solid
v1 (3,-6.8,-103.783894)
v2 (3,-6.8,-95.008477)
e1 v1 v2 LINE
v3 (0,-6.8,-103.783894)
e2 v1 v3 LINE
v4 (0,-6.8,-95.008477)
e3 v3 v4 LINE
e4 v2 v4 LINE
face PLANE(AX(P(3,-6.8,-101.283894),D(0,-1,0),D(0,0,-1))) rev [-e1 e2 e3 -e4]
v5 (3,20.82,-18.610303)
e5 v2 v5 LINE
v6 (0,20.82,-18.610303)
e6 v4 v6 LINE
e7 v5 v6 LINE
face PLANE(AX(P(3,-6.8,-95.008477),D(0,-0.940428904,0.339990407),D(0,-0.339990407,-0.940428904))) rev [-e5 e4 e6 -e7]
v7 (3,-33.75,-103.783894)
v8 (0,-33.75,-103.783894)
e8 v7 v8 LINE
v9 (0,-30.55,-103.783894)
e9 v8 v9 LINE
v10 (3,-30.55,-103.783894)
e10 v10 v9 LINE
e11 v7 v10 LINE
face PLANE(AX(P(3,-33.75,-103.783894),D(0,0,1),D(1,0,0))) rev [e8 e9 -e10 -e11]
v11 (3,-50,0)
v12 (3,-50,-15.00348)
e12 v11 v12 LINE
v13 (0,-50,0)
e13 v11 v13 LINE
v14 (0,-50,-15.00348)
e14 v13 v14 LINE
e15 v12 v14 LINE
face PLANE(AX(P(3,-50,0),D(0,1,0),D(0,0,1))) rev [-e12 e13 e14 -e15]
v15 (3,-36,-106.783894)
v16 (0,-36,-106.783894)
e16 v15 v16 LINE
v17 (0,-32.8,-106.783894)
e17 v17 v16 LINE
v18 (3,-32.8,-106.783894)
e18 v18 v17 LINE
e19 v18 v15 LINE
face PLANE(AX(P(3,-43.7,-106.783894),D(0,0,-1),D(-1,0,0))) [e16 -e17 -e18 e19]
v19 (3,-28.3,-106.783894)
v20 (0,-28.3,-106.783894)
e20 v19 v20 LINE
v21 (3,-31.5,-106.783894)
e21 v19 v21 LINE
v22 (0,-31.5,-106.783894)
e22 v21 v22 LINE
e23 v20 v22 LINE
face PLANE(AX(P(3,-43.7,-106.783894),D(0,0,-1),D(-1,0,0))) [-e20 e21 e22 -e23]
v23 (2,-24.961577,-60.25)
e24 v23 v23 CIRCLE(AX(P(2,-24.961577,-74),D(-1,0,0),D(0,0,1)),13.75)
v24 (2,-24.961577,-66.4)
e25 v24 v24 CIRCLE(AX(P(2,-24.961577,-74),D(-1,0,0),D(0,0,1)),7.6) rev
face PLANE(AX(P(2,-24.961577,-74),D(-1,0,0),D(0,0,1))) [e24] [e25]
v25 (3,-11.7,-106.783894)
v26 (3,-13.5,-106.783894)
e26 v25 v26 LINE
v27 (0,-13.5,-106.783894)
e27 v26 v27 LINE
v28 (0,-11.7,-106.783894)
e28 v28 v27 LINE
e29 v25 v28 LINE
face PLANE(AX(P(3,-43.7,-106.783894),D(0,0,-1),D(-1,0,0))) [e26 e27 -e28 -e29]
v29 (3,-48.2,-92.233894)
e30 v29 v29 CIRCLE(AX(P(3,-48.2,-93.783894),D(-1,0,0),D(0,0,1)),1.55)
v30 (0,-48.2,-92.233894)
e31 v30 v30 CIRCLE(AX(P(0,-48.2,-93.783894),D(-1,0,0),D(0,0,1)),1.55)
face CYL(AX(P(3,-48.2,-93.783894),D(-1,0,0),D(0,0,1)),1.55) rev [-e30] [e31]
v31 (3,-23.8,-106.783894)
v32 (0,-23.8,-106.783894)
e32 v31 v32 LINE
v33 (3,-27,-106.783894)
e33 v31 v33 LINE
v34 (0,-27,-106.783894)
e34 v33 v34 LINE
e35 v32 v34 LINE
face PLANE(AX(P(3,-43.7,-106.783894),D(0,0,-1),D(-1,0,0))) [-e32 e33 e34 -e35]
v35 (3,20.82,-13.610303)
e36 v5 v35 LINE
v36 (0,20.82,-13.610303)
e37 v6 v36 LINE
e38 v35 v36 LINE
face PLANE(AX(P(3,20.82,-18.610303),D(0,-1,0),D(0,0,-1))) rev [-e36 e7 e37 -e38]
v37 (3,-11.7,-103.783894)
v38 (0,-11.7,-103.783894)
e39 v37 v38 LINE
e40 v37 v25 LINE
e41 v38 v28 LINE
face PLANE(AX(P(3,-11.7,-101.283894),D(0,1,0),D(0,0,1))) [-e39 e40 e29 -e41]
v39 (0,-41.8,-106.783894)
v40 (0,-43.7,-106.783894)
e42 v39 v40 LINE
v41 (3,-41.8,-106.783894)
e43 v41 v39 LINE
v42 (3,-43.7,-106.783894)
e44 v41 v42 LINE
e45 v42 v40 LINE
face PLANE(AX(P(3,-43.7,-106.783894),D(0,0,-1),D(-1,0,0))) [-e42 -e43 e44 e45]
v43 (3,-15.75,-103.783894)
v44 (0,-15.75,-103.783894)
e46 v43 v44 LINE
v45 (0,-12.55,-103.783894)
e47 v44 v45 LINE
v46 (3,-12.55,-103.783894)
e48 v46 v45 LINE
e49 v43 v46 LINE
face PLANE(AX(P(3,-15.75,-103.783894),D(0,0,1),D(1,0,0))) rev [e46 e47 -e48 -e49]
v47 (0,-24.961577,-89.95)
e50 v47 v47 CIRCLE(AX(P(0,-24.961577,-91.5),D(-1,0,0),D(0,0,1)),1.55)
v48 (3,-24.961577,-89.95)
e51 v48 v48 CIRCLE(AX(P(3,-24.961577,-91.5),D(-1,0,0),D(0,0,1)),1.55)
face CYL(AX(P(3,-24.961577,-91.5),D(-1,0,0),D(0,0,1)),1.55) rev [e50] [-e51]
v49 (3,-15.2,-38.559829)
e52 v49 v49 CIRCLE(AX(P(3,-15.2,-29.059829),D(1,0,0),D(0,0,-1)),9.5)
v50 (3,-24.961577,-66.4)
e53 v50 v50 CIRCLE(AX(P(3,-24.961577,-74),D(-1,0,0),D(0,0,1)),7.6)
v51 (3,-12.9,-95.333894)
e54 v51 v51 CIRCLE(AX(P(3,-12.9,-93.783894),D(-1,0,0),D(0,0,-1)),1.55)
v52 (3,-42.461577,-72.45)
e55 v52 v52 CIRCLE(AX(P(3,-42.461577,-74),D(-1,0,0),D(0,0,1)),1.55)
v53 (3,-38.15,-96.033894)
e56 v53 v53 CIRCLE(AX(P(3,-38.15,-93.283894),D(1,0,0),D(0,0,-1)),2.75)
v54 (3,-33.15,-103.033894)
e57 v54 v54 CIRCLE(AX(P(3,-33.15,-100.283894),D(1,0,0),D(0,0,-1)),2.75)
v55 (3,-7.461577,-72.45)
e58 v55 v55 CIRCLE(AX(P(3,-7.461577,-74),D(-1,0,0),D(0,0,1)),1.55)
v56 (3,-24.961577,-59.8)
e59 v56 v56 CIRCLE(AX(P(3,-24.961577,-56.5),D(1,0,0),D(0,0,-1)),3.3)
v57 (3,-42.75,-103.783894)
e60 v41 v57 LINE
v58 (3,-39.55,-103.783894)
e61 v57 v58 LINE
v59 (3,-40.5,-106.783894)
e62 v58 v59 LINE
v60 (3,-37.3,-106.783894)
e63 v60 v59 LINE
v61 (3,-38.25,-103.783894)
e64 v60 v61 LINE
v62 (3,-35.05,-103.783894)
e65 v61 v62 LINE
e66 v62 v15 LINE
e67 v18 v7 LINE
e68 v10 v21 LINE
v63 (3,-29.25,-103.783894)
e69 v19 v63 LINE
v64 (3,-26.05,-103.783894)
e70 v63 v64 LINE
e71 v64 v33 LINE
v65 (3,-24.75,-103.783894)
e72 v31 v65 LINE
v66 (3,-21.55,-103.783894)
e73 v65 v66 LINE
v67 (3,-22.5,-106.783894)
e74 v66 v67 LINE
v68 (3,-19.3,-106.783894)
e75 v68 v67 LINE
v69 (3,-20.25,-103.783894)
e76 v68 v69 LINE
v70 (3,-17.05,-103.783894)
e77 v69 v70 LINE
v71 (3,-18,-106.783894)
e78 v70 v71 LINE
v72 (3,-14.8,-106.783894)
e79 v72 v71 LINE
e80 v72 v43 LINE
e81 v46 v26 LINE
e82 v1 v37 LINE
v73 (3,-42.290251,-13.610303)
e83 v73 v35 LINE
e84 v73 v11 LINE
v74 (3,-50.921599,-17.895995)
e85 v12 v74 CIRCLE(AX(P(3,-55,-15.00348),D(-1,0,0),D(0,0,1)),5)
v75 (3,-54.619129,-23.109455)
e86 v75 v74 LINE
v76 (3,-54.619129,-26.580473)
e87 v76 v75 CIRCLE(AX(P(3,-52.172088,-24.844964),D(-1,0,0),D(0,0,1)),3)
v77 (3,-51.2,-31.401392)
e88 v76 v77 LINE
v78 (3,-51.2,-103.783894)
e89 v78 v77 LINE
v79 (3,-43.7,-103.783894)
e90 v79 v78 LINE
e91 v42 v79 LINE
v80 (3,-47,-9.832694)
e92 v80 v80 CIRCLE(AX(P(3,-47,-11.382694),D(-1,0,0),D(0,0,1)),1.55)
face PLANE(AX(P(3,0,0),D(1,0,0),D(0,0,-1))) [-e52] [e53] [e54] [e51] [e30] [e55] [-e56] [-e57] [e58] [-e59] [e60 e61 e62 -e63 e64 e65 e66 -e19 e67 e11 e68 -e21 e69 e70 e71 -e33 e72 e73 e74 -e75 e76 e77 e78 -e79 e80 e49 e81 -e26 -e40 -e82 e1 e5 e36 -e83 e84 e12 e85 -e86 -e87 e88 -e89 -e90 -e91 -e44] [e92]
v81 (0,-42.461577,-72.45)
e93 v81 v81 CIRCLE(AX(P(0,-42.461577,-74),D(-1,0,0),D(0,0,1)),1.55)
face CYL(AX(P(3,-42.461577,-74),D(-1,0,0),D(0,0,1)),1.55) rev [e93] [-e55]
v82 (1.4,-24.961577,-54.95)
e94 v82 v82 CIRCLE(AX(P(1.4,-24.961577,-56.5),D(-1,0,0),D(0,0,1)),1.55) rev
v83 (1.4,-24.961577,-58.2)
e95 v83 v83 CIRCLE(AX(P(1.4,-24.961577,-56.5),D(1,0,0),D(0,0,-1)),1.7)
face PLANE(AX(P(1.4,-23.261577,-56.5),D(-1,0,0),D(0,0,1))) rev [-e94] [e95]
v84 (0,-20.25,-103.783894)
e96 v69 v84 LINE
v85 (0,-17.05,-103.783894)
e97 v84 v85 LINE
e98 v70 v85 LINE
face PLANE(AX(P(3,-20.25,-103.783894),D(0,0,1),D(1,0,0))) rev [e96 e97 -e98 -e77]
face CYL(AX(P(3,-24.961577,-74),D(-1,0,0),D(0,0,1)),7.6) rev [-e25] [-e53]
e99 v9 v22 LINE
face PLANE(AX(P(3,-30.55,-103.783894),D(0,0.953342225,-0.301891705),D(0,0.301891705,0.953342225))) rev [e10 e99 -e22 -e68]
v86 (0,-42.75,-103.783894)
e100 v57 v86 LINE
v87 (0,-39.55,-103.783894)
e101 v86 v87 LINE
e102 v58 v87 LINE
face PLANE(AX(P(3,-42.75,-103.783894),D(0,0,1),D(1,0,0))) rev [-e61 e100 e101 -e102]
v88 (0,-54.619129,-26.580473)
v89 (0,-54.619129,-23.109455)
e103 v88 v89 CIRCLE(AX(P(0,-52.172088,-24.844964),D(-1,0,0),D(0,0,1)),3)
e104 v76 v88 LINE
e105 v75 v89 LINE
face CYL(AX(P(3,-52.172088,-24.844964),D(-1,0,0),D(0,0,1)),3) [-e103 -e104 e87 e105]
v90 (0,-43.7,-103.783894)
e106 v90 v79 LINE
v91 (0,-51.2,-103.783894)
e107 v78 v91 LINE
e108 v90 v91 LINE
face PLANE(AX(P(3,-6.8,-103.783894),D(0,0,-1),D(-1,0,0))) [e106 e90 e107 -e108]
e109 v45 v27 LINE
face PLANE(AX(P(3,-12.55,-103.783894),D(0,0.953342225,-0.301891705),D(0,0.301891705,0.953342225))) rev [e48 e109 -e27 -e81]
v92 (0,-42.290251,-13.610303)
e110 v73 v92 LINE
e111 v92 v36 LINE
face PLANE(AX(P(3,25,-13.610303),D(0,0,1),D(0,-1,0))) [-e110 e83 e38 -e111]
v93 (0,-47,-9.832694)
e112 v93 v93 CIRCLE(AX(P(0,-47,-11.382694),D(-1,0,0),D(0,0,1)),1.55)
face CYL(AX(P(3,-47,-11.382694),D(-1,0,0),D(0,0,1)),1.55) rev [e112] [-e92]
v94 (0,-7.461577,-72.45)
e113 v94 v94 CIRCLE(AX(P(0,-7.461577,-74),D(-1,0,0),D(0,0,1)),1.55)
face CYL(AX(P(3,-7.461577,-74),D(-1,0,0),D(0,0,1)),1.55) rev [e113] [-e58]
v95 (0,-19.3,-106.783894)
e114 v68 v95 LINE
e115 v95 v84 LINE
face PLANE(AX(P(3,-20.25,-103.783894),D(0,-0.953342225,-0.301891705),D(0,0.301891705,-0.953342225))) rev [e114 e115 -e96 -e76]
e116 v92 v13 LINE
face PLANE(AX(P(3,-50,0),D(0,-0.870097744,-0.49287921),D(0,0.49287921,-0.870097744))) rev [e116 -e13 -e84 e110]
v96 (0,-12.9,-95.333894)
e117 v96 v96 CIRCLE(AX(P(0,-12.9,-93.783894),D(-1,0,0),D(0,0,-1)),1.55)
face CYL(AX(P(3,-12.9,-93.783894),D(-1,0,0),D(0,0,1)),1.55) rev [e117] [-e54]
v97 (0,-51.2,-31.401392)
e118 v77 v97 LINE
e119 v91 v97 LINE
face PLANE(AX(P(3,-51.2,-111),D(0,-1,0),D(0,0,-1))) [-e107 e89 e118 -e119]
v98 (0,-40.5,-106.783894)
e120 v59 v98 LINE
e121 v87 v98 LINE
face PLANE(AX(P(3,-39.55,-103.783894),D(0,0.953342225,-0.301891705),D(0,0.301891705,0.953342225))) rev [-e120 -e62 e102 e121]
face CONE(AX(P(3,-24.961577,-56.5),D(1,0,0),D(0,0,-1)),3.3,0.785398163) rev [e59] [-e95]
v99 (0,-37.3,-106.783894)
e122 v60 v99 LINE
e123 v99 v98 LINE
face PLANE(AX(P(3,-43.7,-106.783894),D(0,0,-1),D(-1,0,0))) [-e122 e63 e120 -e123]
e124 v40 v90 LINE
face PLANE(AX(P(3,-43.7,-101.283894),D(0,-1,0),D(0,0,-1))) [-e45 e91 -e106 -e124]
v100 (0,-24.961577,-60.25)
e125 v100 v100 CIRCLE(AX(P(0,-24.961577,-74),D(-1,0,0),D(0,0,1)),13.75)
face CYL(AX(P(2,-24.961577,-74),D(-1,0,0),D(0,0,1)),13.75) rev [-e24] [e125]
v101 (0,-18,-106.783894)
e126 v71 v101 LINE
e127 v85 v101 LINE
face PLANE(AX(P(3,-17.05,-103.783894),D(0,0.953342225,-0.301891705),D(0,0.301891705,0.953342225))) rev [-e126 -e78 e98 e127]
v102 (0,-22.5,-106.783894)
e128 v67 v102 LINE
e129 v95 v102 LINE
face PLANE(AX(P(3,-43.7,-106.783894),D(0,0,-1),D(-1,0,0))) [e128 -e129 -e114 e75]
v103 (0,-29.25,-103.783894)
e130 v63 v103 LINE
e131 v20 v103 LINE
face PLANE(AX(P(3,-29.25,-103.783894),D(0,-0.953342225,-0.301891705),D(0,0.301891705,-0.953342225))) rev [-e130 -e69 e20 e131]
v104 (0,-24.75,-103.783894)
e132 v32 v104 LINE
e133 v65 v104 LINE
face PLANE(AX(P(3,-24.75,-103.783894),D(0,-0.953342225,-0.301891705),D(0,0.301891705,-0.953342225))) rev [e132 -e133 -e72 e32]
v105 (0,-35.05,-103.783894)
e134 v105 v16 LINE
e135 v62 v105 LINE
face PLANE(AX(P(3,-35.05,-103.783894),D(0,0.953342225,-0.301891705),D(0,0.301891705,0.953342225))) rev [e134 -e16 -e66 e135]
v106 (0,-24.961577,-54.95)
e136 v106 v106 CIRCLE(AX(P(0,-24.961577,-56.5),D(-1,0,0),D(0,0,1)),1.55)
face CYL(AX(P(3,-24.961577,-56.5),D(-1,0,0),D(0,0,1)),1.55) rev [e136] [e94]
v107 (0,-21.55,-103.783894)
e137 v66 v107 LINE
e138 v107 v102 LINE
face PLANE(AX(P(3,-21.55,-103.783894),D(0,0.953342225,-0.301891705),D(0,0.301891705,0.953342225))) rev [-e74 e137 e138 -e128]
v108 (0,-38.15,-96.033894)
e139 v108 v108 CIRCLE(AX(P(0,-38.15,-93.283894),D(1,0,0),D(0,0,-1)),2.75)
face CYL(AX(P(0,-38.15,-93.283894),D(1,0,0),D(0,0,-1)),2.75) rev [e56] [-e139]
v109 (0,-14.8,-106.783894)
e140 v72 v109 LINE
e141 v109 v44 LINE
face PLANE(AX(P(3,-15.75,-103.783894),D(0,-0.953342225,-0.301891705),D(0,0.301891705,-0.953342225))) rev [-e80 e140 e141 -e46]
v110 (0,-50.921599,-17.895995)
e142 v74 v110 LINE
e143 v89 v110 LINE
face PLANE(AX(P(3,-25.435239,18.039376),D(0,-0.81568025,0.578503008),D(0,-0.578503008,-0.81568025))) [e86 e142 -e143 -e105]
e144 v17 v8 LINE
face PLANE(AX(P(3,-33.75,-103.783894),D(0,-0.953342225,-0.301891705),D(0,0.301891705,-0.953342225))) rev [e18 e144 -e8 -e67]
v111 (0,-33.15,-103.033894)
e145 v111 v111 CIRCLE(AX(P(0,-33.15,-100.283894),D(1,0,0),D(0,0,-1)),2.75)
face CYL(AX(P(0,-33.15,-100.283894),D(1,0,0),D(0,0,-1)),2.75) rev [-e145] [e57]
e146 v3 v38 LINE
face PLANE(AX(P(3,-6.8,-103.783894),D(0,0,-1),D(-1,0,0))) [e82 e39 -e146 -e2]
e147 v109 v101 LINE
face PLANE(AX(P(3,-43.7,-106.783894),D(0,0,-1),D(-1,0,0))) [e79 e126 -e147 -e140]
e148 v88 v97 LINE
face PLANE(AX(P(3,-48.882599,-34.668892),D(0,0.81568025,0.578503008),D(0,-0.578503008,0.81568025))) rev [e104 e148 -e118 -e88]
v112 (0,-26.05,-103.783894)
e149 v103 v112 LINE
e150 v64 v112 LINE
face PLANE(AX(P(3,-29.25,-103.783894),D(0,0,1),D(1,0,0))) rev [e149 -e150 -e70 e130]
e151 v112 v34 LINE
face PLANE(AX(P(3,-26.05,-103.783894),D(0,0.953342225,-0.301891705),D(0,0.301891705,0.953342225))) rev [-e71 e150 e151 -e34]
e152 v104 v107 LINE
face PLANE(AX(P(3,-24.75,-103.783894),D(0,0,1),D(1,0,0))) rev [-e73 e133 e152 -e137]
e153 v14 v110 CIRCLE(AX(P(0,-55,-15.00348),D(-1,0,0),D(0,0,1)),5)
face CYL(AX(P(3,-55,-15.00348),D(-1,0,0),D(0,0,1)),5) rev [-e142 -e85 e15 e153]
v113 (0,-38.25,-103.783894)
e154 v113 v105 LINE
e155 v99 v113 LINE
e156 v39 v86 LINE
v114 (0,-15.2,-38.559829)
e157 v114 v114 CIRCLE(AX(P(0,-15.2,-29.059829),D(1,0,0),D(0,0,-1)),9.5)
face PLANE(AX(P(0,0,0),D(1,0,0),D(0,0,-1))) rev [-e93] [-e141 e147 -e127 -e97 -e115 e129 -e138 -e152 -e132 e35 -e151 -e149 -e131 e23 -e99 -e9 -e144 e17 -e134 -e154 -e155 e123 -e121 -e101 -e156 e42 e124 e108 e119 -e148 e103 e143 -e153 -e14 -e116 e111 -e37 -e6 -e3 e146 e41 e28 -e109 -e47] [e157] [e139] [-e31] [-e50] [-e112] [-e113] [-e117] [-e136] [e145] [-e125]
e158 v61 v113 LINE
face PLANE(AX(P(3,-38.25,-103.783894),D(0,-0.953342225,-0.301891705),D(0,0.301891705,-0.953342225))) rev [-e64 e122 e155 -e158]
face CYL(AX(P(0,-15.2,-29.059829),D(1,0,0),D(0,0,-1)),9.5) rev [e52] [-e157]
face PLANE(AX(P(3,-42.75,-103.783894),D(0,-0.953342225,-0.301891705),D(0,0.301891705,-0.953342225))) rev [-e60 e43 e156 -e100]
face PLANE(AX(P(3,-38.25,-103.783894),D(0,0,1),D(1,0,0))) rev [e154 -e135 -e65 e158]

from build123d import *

# Parameters (mm, degrees)
EXTRUDE_1_DEPTH         = 3
SKETCH_3_R              = 7.6
SKETCH_3_R_2            = 9.5
SKETCH_3_R_3            = 1.55
CUT_EXTRUDE_1_DEPTH     = 112.843640856
SKETCH_4_R              = 13.75
CUT_EXTRUDE_2_DEPTH     = 2
EXTRUDE_6_DEPTH         = 3
SKETCH_10_R             = 1.55
CUT_EXTRUDE_3_DEPTH     = 124.991771172
CUT_EXTRUDE_6_DEPTH     = 124.991771172
EXTRUDE_7_DEPTH         = 3
CUT_EXTRUDE_7_DEPTH     = 124.991771172
SKETCH_18_W             = 9.7
SKETCH_18_H             = 35
CUT_EXTRUDE_9_DEPTH     = 124.991771172
SKETCH_19_R             = 1.55
CUT_EXTRUDE_10_DEPTH    = 124.991771172
SKETCH_20_W             = 61.573881036
SKETCH_20_H             = 3.2
SKETCH_20_W_2           = 79.598608315
SKETCH_20_H_2           = 1.2
EXTRUDE_8_DEPTH         = 3
EXTRUDE_START           = -3
EXTRUDE_9_DEPTH         = 3
EXTRUDE_11_DEPTH        = 3
SKETCH_25_R             = 9.5
EXTRUDE_12_DEPTH        = 3
SKETCH_26_R             = 9.5
CUT_EXTRUDE_11_DEPTH    = 124.991771172
EXTRUDE_13_DEPTH        = 3
CUT_EXTRUDE_12_DEPTH    = 3
SKETCH_29_W             = 5.5
SKETCH_29_H             = 32
EXTRUDE_14_DEPTH        = 3
SKETCH_32_W             = 9.716106013
SKETCH_32_H             = 6
CUT_EXTRUDE_13_DEPTH    = 124.991771172
CUT_EXTRUDE_16_DEPTH    = 3
SKETCH_35_W             = 2.5
SKETCH_35_H             = 44.4
EXTRUDE_15_DEPTH        = 3
SKETCH_36_R             = 1.55
CUT_EXTRUDE_14691_DEPTH = 3
EXTRUDE_16_DEPTH        = 3
SKETCH_38_R             = 2.75
CUT_EXTRUDE_L_DEPTH     = 121.232106085
SKETCH_57_R             = 1.55
EXTRUDE_17_DEPTH        = 3
CUT_EXTRUDE_17_DEPTH    = 121.232106085


# Read off the part's stored shape, not the designer's step: 高级异型孔6
with BuildPart() as part:
    # 草图1 → 凸台-拉伸1 (new body)
    with BuildSketch(Plane(origin=(0, 0, 0), x_dir=(0, 0, -1), z_dir=(1, 0, 0))):
        Polygon((0, -50), (18.610302832, -39.45792997), (18.610302832, 40), (58.496702951, 40), (58.496702951, 0), (100, 0), (100, -50), align=None)
    extrude(amount=EXTRUDE_1_DEPTH)

    # 草图3 → 切除-拉伸1 (cut, through all)
    with BuildSketch(Plane.ZY):
        with Locations((-74, -24.961577338)):
            Circle(SKETCH_3_R)
        with Locations((-34.176393222, 0)):
            Circle(SKETCH_3_R_2)
        with Locations((-74, -7.461577338)):
            Circle(SKETCH_3_R_3)
        with Locations((-56.5, -24.961577338)):
            Circle(SKETCH_3_R_3)
        with Locations((-74, -42.461577338)):
            Circle(SKETCH_3_R_3)
        with Locations((-91.5, -24.961577338)):
            Circle(SKETCH_3_R_3)
    extrude(amount=-CUT_EXTRUDE_1_DEPTH, mode=Mode.SUBTRACT)

    # 草图4 → 切除-拉伸2 (cut)
    with BuildSketch(Plane.ZY):
        with Locations((-74, -24.961577338)):
            Circle(SKETCH_4_R)
    extrude(amount=-CUT_EXTRUDE_2_DEPTH, mode=Mode.SUBTRACT)

    # 草图6 → 凸台-拉伸6 (add)
    with BuildSketch(Plane.ZY):
        with BuildLine():
            Line((-102.983893987, -45.2), (-110.983893987, -45.2))
            Line((-110.983893987, -45.2), (-111, -50))
            Line((-111, -50), (-100, -50))
            Line((-100, -50), (-100, 0))
            Line((-100, 0), (-110.983893987, 0))
            Line((-110.983893987, 0), (-110.983893987, -6.8))
            Line((-110.983893987, -6.8), (-102.983893987, -6.8))
            ThreePointArc((-102.983893987, -6.8), (-101.283893987, -8.5), (-102.983893987, -10.2))
            Line((-102.983893987, -10.2), (-110.983893987, -10.2))
            Line((-110.983893987, -10.2), (-110.983893987, -41.8))
            Line((-110.983893987, -41.8), (-102.983893987, -41.8))
            ThreePointArc((-102.983893987, -41.8), (-101.283893987, -43.5), (-102.983893987, -45.2))
        make_face()
        with BuildLine():
            Line((-15.00347976, -50), (-34.686448159, -50))
            ThreePointArc((-34.686448159, -50), (-33.16855591, -50.235967767), (-31.793933119, -50.921598751))
            Line((-31.793933119, -50.921598751), (-26.580472983, -54.619128968))
            ThreePointArc((-26.580472983, -54.619128968), (-25.755699309, -55.030507559), (-24.844963959, -55.172088219))
            ThreePointArc((-24.844963959, -55.172088219), (-23.93422861, -55.030507559), (-23.109454935, -54.619128968))
            Line((-23.109454935, -54.619128968), (-17.8959948, -50.921598751))
            ThreePointArc((-17.8959948, -50.921598751), (-16.521372009, -50.235967767), (-15.00347976, -50))
        make_face()
    extrude(amount=-EXTRUDE_6_DEPTH)

    # 草图10 → 切除-拉伸3 (cut, through all)
    with BuildSketch(Plane.ZY):
        with Locations((-105.983893987, -15.2)):
            Circle(SKETCH_10_R)
        with Locations((-105.983893987, -36.8)):
            Circle(SKETCH_10_R)
    extrude(amount=-CUT_EXTRUDE_3_DEPTH, mode=Mode.SUBTRACT)

    # 草图14 → 切除-拉伸6 (cut, through all)
    with BuildSketch(Plane(origin=(3, 0, 0), x_dir=(0, 0, -1), z_dir=(1, 0, 0))):
        with BuildLine():
            Line((58.496702951, 0), (58.496702951, 40))
            Line((58.496702951, 40), (18.610302832, 40))
            Line((18.610302832, 40), (18.610302832, 18.686206016))
            ThreePointArc((18.610302832, 18.686206016), (44.493983197, 22.023278649), (58.496702951, 0))
        make_face()
    extrude(amount=-CUT_EXTRUDE_6_DEPTH, mode=Mode.SUBTRACT)

    # 草图15 → 凸台-拉伸7 (add)
    with BuildSketch(Plane(origin=(3, 0, 0), x_dir=(0, 0, -1), z_dir=(1, 0, 0))):
        with BuildLine():
            Line((18.610302832, 18.686206016), (18.610302832, -18.686206016))
            ThreePointArc((18.610302832, -18.686206016), (9.856083494, 0), (18.610302832, 18.686206016))
        make_face()
    extrude(amount=-EXTRUDE_7_DEPTH)

    # 草图16 → 切除-拉伸7 (cut, through all)
    with BuildSketch(Plane(origin=(3, 0, 0), x_dir=(0, 0, -1), z_dir=(1, 0, 0))):
        with BuildLine():
            Line((18.610302832, -18.686206016), (18.610302832, 0))
            ThreePointArc((18.610302832, 0), (34.176393222, 15.56609039), (49.742483613, 0))
            Line((49.742483613, 0), (58.496702951, 0))
            ThreePointArc((58.496702951, 0), (23.858803248, 22.023278649), (18.610302832, -18.686206016))
        make_face()
    extrude(amount=-CUT_EXTRUDE_7_DEPTH, mode=Mode.SUBTRACT)

    # 草图18 → 切除-拉伸9 (cut, through all)
    with BuildSketch(Plane.ZY):
        with Locations((-106.133893987, -26)):
            Rectangle(SKETCH_18_W, SKETCH_18_H)
    extrude(amount=-CUT_EXTRUDE_9_DEPTH, mode=Mode.SUBTRACT)

    # 草图19 → 切除-拉伸10 (cut, through all)
    with BuildSketch(Plane.ZY):
        with Locations((-105.983893987, -1.8)):
            Circle(SKETCH_19_R)
        with Locations((-105.993932098, -48.2)):
            Circle(SKETCH_19_R)
    extrude(amount=-CUT_EXTRUDE_10_DEPTH, mode=Mode.SUBTRACT)

    # 草图20 → 凸台-拉伸8 (add)
    with BuildSketch(Plane.ZY):
        with Locations((-80.196953469, 1.6)):
            Rectangle(SKETCH_20_W, SKETCH_20_H)
        with Locations((-71.200695842, -50.6)):
            Rectangle(SKETCH_20_W_2, SKETCH_20_H_2)
    extrude(amount=-EXTRUDE_8_DEPTH)

    # 草图22 → 凸台-拉伸9 (add)
    with BuildSketch(Plane.ZY.offset(EXTRUDE_START)):
        with BuildLine():
            Line((-18.610302832, 0), (-18.610302832, 25))
            Line((-18.610302832, 25), (-41.044918155, 13.968769999))
            ThreePointArc((-41.044918155, 13.968769999), (-25.948784515, 13.213993529), (-18.610302832, 0))
        make_face()
    extrude(amount=EXTRUDE_9_DEPTH)

    # 草图24 → 凸台-拉伸11 (add)
    with BuildSketch(Plane.ZY):
        Polygon((-18.610302832, 25), (-70.983893987, 3.2), (-49.410012951, 3.2), align=None)
    extrude(amount=-EXTRUDE_11_DEPTH)

    # 草图25 → 凸台-拉伸12 (add, through all)
    with BuildSketch(Plane(origin=(3, 0, 0), x_dir=(0, 0, -1), z_dir=(1, 0, 0))):
        with Locations((34.176393222, 0)):
            Circle(SKETCH_25_R)
    extrude(amount=-EXTRUDE_12_DEPTH)

    # 草图26 → 切除-拉伸11 (cut, through all)
    with BuildSketch(Plane(origin=(3, 0, 0), x_dir=(0, 0, -1), z_dir=(1, 0, 0))):
        with Locations((29.059828781, -15.2)):
            Circle(SKETCH_26_R)
    extrude(amount=-CUT_EXTRUDE_11_DEPTH, mode=Mode.SUBTRACT)

    # 草图27 → 凸台-拉伸13 (add)
    with BuildSketch(Plane.ZY):
        Polygon((-18.610302832, -10.2), (-13.610302832, -15.2), (-18.610302832, -20.2), align=None)
    extrude(amount=-EXTRUDE_13_DEPTH)

    # 草图28 → 切除-拉伸12 (cut)
    with BuildSketch(Plane.ZY):
        Polygon((-110.983893987, 3.2), (-101.283893987, 3.2), (-70.983893987, 3.2), (-95.008477086, -6.8), (-101.283893987, -6.8), (-101.283893987, -45.2), (-110.983893987, -45.2), align=None)
    extrude(amount=-CUT_EXTRUDE_12_DEPTH, mode=Mode.SUBTRACT)

    # 草图29 → 凸台-拉伸14 (add)
    with BuildSketch(Plane.ZY):
        with Locations((-104.033893987, -27.7)):
            Rectangle(SKETCH_29_W, SKETCH_29_H)
    extrude(amount=-EXTRUDE_14_DEPTH)

    # 草图32 → 切除-拉伸13 (cut, through all)
    with BuildSketch(Plane.ZY):
        with Locations((-106.141946993, -48.2)):
            Rectangle(SKETCH_32_W, SKETCH_32_H)
    extrude(amount=-CUT_EXTRUDE_13_DEPTH, mode=Mode.SUBTRACT)

    # 草图34 → 切除-拉伸16 (cut)
    with BuildSketch(Plane.ZY):
        Polygon((-103.783893987, -15.75), (-103.783893987, -12.55), (-106.783893987, -13.5), (-106.783893987, -14.8), align=None)
        Polygon((-106.783893987, -18), (-106.783893987, -19.3), (-103.783893987, -20.25), (-103.783893987, -17.05), align=None)
        Polygon((-106.783893987, -22.5), (-106.783893987, -23.8), (-103.783893987, -24.75), (-103.783893987, -21.55), align=None)
        Polygon((-106.783893987, -27), (-106.783893987, -28.3), (-103.783893987, -29.25), (-103.783893987, -26.05), align=None)
        Polygon((-106.783893987, -31.5), (-106.783893987, -32.8), (-103.783893987, -33.75), (-103.783893987, -30.55), align=None)
        Polygon((-106.783893987, -36), (-106.783893987, -37.3), (-103.783893987, -38.25), (-103.783893987, -35.05), align=None)
        Polygon((-106.783893987, -40.5), (-106.783893987, -41.8), (-103.783893987, -42.75), (-103.783893987, -39.55), align=None)
    extrude(amount=-CUT_EXTRUDE_16_DEPTH, mode=Mode.SUBTRACT)

    # 草图35 → 凸台-拉伸15 (add, through all)
    with BuildSketch(Plane.ZY):
        with Locations((-102.533893987, -29)):
            Rectangle(SKETCH_35_W, SKETCH_35_H)
    extrude(amount=-EXTRUDE_15_DEPTH)

    # 草图36 → Cut-Extrude 14691 (cut)
    with BuildSketch(Plane.ZY):
        with Locations((-93.783893987, -48.2)):
            Circle(SKETCH_36_R)
        with Locations(Location((-93.783893987, -12.9, 0), (0, 0, 180))):
            Circle(SKETCH_36_R)
        with Locations((-21.610302832, 20.501770791)):
            Circle(SKETCH_36_R)
        with Locations((-11.382694019, -47)):
            Circle(SKETCH_36_R)
    extrude(amount=-CUT_EXTRUDE_14691_DEPTH, mode=Mode.SUBTRACT)

    # 草图37 → 凸台-拉伸16 (add)
    with BuildSketch(Plane.ZY):
        Polygon((-13.610302832, -39.45792997), (-13.610302832, -42.290250896), (-18.610302832, -39.45792997), (-18.610302832, 25), (-13.610302832, 25), align=None)
    extrude(amount=-EXTRUDE_16_DEPTH)

    # 草图38 → L型支架定位孔 (cut, through all)
    with BuildSketch(Plane(origin=(3, 0, 0), x_dir=(0, 0, -1), z_dir=(1, 0, 0))):
        with Locations((93.283893987, -38.15)):
            Circle(SKETCH_38_R)
        with Locations((100.283893987, -33.15)):
            Circle(SKETCH_38_R)
    extrude(amount=-CUT_EXTRUDE_L_DEPTH, mode=Mode.SUBTRACT)

    # 高级异型孔6 outline → 高级异型孔6 (revolve, cut)
    with BuildSketch(Plane(origin=(0, -24.961577338, -56.5), x_dir=(0, 1, 0), z_dir=(0, 0, -1))):
        Polygon((1.55, 3), (1.55, 1.4), (1.7, 1.4), (3.3, 3), align=None)
    revolve(axis=Axis((0, -24.961577338, -56.5), (1, 0, 0)), mode=Mode.SUBTRACT)

    # 草图57 → 凸台-拉伸17 (add, through all)
    with BuildSketch(Plane.ZY):
        with Locations((-21.610302832, 20.501770791)):
            Circle(SKETCH_57_R)
    extrude(amount=-EXTRUDE_17_DEPTH)

    # 草图56 → 切除-拉伸17 (cut, through all)
    with BuildSketch(Plane.ZY):
        Polygon((-95.008477086, -6.8), (-18.610302832, 20.82), (-13.610302832, 20.82), (-13.610302832, 25), (-18.610302832, 25), align=None)
    extrude(amount=-CUT_EXTRUDE_17_DEPTH, mode=Mode.SUBTRACT)


solid = part.part
